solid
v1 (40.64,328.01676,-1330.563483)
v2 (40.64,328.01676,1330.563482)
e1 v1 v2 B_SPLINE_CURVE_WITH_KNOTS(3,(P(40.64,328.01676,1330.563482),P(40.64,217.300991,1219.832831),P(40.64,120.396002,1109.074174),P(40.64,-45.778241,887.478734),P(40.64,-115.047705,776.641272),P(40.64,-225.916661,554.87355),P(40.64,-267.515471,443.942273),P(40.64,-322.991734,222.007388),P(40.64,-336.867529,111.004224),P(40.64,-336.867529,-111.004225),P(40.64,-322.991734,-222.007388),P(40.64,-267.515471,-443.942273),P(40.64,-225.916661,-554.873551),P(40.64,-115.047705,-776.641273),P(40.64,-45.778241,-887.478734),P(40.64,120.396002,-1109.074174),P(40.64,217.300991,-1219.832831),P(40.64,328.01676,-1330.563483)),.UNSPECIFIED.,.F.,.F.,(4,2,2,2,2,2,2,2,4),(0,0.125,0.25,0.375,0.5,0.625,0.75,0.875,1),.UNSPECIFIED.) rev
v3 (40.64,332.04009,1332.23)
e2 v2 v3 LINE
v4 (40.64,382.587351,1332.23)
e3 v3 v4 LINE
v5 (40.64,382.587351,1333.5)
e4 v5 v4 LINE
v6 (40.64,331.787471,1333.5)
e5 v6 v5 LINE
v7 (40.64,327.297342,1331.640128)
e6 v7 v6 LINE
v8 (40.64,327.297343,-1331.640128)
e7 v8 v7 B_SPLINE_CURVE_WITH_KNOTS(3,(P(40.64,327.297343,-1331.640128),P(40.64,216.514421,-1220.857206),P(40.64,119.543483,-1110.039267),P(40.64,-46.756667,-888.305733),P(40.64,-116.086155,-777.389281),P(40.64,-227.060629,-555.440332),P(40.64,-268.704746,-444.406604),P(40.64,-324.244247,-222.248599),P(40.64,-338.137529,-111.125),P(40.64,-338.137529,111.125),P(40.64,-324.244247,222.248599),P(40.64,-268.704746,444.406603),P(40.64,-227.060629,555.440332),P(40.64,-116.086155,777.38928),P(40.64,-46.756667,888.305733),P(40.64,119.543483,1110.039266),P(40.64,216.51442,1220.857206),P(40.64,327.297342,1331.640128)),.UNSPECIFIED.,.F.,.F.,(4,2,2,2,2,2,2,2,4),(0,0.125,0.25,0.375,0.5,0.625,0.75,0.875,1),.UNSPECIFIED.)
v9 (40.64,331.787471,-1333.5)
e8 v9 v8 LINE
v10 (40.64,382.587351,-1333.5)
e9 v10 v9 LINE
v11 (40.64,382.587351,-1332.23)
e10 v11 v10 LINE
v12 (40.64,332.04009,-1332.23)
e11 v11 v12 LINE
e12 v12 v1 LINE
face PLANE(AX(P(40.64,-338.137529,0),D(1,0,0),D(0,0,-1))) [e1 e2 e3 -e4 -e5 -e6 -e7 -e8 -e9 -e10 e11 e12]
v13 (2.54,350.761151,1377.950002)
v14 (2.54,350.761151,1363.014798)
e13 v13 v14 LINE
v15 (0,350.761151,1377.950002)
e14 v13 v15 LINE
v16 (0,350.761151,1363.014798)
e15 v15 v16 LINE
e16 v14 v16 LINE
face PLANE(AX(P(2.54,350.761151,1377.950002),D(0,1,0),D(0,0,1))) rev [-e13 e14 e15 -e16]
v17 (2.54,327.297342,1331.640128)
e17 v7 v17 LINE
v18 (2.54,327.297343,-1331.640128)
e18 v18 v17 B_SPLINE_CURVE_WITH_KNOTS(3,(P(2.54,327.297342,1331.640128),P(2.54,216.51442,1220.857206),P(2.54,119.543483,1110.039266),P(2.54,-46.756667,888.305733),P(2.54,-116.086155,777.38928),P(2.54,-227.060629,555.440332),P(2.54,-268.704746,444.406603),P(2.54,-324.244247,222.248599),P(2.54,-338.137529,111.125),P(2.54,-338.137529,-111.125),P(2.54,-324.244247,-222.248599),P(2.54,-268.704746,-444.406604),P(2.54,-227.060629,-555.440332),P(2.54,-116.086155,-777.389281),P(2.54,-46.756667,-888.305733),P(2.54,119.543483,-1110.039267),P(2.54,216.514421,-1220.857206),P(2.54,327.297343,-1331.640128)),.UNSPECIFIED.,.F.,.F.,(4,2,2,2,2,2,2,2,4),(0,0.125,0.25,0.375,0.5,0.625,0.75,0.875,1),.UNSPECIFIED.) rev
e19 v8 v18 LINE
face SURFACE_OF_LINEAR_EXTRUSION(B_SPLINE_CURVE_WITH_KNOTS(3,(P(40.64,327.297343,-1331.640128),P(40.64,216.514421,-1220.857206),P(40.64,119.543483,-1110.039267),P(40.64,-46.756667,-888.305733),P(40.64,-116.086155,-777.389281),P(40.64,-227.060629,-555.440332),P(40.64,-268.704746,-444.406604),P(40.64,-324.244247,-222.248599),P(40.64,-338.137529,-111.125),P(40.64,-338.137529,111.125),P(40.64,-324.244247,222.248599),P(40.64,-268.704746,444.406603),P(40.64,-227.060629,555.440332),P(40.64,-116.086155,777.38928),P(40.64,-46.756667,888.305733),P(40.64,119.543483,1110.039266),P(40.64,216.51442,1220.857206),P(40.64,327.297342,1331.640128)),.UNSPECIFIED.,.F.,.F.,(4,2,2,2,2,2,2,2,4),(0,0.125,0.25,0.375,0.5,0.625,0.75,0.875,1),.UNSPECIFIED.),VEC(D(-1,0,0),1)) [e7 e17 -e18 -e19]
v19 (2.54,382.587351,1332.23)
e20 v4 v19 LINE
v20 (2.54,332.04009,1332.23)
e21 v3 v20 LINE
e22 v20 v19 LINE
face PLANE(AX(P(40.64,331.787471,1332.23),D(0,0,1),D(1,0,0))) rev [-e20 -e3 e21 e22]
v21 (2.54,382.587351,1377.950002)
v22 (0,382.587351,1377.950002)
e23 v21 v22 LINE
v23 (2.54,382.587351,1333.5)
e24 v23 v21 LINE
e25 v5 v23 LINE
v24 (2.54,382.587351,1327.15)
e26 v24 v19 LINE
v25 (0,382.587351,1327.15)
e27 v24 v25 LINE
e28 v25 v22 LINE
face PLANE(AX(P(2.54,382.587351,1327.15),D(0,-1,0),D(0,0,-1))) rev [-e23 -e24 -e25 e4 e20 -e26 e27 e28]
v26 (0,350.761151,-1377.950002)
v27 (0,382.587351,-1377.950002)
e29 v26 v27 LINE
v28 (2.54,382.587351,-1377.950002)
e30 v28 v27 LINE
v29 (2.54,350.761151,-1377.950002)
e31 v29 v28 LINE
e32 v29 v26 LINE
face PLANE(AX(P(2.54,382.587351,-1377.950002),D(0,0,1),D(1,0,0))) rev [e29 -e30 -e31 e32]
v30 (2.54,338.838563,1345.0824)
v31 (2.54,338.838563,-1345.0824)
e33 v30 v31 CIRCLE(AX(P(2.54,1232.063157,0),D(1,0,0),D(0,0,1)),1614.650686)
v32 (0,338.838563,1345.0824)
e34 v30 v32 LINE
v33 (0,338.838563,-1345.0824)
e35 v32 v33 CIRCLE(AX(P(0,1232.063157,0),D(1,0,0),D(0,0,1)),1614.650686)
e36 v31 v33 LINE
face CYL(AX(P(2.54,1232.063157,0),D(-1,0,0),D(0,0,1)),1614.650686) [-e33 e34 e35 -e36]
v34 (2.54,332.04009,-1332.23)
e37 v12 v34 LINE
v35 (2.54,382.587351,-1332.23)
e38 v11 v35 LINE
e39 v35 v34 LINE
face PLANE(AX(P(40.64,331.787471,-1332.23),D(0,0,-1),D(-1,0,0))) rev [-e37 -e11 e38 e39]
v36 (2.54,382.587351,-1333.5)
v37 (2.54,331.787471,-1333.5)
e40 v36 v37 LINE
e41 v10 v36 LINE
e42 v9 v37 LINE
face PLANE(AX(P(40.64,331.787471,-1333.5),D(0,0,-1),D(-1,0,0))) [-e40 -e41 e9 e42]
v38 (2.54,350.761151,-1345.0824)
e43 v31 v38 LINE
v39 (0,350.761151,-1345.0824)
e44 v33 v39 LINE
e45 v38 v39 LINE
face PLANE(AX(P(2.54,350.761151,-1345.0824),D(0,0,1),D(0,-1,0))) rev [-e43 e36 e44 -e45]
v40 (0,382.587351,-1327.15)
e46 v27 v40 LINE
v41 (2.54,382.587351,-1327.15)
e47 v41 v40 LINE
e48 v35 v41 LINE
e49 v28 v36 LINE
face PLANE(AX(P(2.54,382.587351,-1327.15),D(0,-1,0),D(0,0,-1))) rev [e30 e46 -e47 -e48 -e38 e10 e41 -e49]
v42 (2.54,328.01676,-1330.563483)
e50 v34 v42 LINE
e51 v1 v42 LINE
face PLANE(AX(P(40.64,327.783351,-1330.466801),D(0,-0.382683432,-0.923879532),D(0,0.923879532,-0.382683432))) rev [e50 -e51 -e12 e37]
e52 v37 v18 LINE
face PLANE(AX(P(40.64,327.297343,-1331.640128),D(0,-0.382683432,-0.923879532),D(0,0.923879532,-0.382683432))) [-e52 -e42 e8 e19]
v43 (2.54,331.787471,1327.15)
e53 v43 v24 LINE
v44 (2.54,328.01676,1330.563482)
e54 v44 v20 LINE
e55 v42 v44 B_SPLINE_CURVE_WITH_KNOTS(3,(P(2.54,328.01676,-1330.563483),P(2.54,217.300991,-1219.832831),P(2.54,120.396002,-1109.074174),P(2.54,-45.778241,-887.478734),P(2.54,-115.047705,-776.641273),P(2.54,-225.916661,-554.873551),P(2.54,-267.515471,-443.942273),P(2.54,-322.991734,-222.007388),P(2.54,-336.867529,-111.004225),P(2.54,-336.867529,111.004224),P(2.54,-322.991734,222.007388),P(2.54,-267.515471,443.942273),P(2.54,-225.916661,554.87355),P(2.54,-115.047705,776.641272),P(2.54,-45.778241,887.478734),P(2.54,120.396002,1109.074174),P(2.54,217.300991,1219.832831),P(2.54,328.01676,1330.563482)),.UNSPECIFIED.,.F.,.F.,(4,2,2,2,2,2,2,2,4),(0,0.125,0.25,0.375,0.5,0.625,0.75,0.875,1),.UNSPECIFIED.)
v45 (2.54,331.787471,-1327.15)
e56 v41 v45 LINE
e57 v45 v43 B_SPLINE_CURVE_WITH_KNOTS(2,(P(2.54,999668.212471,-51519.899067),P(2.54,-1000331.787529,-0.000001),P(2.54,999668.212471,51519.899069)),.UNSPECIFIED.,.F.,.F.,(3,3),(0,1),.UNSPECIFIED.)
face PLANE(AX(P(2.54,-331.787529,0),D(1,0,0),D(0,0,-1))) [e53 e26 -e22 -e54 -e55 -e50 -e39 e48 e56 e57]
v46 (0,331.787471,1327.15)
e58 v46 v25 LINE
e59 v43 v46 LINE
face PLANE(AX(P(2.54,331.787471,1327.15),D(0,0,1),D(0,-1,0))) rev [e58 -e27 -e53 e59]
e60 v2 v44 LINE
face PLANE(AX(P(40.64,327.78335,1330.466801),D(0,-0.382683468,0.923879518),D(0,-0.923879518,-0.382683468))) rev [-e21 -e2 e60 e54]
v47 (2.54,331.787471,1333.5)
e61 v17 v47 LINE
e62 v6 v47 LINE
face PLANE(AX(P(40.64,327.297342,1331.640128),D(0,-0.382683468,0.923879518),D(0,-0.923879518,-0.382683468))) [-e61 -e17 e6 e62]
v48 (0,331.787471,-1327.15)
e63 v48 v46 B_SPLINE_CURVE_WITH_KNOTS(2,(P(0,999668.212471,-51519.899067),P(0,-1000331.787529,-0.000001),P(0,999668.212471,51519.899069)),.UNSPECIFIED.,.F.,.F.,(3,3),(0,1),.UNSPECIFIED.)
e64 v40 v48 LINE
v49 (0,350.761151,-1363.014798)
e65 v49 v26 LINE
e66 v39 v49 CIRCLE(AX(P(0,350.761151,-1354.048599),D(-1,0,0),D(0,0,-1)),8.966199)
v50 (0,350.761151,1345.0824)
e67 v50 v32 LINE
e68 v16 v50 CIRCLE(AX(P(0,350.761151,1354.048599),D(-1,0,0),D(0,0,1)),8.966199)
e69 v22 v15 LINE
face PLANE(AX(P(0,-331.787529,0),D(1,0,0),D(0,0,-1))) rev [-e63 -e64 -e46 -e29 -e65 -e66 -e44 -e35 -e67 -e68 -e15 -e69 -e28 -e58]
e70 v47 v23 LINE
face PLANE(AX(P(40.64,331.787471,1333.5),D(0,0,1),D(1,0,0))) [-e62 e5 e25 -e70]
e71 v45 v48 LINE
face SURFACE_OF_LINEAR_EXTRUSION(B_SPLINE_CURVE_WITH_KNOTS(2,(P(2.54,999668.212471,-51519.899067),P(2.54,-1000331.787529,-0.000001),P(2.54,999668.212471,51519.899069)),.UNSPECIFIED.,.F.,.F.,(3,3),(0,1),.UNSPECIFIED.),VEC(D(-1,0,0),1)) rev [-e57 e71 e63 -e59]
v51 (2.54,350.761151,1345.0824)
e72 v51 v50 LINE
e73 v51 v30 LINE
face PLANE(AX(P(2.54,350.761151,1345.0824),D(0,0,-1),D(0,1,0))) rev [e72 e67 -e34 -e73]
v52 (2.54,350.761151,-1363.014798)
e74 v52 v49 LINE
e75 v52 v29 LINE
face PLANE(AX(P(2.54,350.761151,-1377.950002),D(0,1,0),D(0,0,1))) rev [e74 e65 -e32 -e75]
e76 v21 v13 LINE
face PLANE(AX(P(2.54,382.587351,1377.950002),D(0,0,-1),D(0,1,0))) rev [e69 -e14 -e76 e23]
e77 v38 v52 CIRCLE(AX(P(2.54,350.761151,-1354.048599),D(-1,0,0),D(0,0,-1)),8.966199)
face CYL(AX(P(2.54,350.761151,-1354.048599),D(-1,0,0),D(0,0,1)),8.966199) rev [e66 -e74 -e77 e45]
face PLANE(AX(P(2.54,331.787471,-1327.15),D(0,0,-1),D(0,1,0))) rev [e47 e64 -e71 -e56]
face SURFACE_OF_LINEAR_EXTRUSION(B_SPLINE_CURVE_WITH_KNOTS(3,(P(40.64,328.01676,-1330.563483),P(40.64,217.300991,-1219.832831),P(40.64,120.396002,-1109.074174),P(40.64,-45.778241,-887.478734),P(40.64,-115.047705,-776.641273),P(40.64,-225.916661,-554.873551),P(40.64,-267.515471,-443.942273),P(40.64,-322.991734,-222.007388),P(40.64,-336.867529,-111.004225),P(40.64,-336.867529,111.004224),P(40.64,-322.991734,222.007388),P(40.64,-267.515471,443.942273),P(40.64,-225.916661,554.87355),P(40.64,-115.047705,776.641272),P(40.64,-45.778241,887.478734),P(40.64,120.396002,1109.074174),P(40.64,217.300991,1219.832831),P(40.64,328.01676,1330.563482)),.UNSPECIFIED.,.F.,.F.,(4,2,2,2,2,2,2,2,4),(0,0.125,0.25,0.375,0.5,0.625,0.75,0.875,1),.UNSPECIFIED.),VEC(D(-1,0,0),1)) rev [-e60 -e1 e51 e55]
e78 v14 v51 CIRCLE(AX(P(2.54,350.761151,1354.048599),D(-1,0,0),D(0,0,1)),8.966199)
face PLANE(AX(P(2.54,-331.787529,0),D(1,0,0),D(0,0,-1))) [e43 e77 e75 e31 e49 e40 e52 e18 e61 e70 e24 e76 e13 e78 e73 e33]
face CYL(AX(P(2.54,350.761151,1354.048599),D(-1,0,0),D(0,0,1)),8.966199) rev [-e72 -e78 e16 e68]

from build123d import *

# Parameters (mm, degrees)
BOSS_EXTRUDE1_DEPTH = 2.54
EXTRUDE_THIN1_DEPTH = 38.1


# Read off the part's stored shape, not the designer's step: Extrude-Thin1
with BuildPart() as part:
    # Sketch60 → Boss-Extrude1 (new body)
    with BuildSketch(Plane(origin=(0, 0, 0), x_dir=(0, 0, -1), z_dir=(1, 0, 0))):
        with BuildLine():
            Line((1327.15, 331.787470833), (1327.15, 382.587350833))
            Line((1327.15, 382.587350833), (1377.950002406, 382.587350833))
            Line((1377.950002406, 382.587350833), (1377.950002406, 350.761150833))
            Line((1377.950002406, 350.761150833), (1363.014798129, 350.761150833))
            ThreePointArc((1363.014798129, 350.761150833), (1354.048599065, 359.727349897), (1345.0824, 350.761150833))
            Line((1345.0824, 350.761150833), (1345.0824, 338.838562796))
            ThreePointArc((1345.0824, 338.838562796), (0, -382.587529167), (-1345.0824, 338.838562795))
            Line((-1345.0824, 338.838562795), (-1345.0824, 350.761150833))
            ThreePointArc((-1345.0824, 350.761150833), (-1354.048599065, 359.727349897), (-1363.014798129, 350.761150833))
            Line((-1363.014798129, 350.761150833), (-1377.950002406, 350.761150833))
            Line((-1377.950002406, 350.761150833), (-1377.950002406, 382.587350833))
            Line((-1377.950002406, 382.587350833), (-1327.15, 382.587350833))
            Line((-1327.15, 382.587350833), (-1327.15, 331.787470833))
            add(Edge.make_bspline(
                [(1327.15, 331.787470833), (1e-09, -995.362529167), (-1327.15, 331.787470833)],
                knots=[0, 0, 0, 1, 1, 1], degree=2))
        make_face()
    extrude(amount=BOSS_EXTRUDE1_DEPTH)

    # Extrude-Thin1 outline → Extrude-Thin1 (add)
    with BuildSketch(Plane(origin=(2.54, 0, 0), x_dir=(0, 0, -1), z_dir=(1, 0, 0))):
        with BuildLine():
            add(Edge.make_bspline(
                [(1331.64012806, 327.297342772), (1220.857206072, 216.514420784), (1110.039266695, 119.543483359), (888.305733392, -46.756666627), (777.389280582, -116.086154697), (555.440332256, -227.060628875), (444.406603679, -268.704745917), (222.248599022, -324.244247103), (111.125000161, -338.137529152), (-111.124999809, -338.137529182), (-222.24859867, -324.244247162), (-444.406603328, -268.704746034), (-555.440331905, -227.060629021), (-777.389280231, -116.086154902), (-888.305733041, -46.756666861), (-1110.039266345, 119.543483066), (-1220.857205722, 216.514420463), (-1331.64012771, 327.297342421)],
                knots=[0, 0, 0, 0, 0.125, 0.125, 0.25, 0.25, 0.375, 0.375, 0.5, 0.5, 0.625, 0.625, 0.75, 0.75, 0.875, 0.875, 1, 1, 1, 1], degree=3))
            Line((1331.64012806, 327.297342772), (1333.5, 331.787470833))
            Line((1333.5, 331.787470833), (1333.5, 382.587350833))
            Line((1333.5, 382.587350833), (1332.23, 382.587350833))
            Line((1332.23, 382.587350833), (1332.23, 332.04008954))
            Line((1332.23, 332.04008954), (1330.563482535, 328.016760475))
            add(Edge.make_bspline(
                [(1330.563482535, 328.016760475), (1219.832830837, 217.300990844), (1109.074174075, 120.39600204), (887.478733858, -45.778240912), (776.641272659, -115.047704785), (554.873550579, -225.916661245), (443.942272952, -267.515471252), (222.0073883, -322.991733554), (111.004224806, -336.867529153), (-111.004224472, -336.867529181), (-222.007387967, -322.991733609), (-443.942272618, -267.515471364), (-554.873550246, -225.916661384), (-776.641272326, -115.047704979), (-887.478733526, -45.778241134), (-1109.074173743, 120.396001763), (-1219.832830505, 217.300990539), (-1330.563482203, 328.016760142)],
                knots=[0, 0, 0, 0, 0.125, 0.125, 0.25, 0.25, 0.375, 0.375, 0.5, 0.5, 0.625, 0.625, 0.75, 0.75, 0.875, 0.875, 1, 1, 1, 1], degree=3))
            Line((-1330.563482203, 328.016760142), (-1332.23, 332.040089565))
            Line((-1332.23, 332.040089565), (-1332.23, 382.587350833))
            Line((-1332.23, 382.587350833), (-1333.5, 382.587350833))
            Line((-1333.5, 382.587350833), (-1333.5, 331.787470833))
            Line((-1333.5, 331.787470833), (-1331.64012771, 327.297342421))
        make_face()
    extrude(amount=EXTRUDE_THIN1_DEPTH)


solid = part.part
